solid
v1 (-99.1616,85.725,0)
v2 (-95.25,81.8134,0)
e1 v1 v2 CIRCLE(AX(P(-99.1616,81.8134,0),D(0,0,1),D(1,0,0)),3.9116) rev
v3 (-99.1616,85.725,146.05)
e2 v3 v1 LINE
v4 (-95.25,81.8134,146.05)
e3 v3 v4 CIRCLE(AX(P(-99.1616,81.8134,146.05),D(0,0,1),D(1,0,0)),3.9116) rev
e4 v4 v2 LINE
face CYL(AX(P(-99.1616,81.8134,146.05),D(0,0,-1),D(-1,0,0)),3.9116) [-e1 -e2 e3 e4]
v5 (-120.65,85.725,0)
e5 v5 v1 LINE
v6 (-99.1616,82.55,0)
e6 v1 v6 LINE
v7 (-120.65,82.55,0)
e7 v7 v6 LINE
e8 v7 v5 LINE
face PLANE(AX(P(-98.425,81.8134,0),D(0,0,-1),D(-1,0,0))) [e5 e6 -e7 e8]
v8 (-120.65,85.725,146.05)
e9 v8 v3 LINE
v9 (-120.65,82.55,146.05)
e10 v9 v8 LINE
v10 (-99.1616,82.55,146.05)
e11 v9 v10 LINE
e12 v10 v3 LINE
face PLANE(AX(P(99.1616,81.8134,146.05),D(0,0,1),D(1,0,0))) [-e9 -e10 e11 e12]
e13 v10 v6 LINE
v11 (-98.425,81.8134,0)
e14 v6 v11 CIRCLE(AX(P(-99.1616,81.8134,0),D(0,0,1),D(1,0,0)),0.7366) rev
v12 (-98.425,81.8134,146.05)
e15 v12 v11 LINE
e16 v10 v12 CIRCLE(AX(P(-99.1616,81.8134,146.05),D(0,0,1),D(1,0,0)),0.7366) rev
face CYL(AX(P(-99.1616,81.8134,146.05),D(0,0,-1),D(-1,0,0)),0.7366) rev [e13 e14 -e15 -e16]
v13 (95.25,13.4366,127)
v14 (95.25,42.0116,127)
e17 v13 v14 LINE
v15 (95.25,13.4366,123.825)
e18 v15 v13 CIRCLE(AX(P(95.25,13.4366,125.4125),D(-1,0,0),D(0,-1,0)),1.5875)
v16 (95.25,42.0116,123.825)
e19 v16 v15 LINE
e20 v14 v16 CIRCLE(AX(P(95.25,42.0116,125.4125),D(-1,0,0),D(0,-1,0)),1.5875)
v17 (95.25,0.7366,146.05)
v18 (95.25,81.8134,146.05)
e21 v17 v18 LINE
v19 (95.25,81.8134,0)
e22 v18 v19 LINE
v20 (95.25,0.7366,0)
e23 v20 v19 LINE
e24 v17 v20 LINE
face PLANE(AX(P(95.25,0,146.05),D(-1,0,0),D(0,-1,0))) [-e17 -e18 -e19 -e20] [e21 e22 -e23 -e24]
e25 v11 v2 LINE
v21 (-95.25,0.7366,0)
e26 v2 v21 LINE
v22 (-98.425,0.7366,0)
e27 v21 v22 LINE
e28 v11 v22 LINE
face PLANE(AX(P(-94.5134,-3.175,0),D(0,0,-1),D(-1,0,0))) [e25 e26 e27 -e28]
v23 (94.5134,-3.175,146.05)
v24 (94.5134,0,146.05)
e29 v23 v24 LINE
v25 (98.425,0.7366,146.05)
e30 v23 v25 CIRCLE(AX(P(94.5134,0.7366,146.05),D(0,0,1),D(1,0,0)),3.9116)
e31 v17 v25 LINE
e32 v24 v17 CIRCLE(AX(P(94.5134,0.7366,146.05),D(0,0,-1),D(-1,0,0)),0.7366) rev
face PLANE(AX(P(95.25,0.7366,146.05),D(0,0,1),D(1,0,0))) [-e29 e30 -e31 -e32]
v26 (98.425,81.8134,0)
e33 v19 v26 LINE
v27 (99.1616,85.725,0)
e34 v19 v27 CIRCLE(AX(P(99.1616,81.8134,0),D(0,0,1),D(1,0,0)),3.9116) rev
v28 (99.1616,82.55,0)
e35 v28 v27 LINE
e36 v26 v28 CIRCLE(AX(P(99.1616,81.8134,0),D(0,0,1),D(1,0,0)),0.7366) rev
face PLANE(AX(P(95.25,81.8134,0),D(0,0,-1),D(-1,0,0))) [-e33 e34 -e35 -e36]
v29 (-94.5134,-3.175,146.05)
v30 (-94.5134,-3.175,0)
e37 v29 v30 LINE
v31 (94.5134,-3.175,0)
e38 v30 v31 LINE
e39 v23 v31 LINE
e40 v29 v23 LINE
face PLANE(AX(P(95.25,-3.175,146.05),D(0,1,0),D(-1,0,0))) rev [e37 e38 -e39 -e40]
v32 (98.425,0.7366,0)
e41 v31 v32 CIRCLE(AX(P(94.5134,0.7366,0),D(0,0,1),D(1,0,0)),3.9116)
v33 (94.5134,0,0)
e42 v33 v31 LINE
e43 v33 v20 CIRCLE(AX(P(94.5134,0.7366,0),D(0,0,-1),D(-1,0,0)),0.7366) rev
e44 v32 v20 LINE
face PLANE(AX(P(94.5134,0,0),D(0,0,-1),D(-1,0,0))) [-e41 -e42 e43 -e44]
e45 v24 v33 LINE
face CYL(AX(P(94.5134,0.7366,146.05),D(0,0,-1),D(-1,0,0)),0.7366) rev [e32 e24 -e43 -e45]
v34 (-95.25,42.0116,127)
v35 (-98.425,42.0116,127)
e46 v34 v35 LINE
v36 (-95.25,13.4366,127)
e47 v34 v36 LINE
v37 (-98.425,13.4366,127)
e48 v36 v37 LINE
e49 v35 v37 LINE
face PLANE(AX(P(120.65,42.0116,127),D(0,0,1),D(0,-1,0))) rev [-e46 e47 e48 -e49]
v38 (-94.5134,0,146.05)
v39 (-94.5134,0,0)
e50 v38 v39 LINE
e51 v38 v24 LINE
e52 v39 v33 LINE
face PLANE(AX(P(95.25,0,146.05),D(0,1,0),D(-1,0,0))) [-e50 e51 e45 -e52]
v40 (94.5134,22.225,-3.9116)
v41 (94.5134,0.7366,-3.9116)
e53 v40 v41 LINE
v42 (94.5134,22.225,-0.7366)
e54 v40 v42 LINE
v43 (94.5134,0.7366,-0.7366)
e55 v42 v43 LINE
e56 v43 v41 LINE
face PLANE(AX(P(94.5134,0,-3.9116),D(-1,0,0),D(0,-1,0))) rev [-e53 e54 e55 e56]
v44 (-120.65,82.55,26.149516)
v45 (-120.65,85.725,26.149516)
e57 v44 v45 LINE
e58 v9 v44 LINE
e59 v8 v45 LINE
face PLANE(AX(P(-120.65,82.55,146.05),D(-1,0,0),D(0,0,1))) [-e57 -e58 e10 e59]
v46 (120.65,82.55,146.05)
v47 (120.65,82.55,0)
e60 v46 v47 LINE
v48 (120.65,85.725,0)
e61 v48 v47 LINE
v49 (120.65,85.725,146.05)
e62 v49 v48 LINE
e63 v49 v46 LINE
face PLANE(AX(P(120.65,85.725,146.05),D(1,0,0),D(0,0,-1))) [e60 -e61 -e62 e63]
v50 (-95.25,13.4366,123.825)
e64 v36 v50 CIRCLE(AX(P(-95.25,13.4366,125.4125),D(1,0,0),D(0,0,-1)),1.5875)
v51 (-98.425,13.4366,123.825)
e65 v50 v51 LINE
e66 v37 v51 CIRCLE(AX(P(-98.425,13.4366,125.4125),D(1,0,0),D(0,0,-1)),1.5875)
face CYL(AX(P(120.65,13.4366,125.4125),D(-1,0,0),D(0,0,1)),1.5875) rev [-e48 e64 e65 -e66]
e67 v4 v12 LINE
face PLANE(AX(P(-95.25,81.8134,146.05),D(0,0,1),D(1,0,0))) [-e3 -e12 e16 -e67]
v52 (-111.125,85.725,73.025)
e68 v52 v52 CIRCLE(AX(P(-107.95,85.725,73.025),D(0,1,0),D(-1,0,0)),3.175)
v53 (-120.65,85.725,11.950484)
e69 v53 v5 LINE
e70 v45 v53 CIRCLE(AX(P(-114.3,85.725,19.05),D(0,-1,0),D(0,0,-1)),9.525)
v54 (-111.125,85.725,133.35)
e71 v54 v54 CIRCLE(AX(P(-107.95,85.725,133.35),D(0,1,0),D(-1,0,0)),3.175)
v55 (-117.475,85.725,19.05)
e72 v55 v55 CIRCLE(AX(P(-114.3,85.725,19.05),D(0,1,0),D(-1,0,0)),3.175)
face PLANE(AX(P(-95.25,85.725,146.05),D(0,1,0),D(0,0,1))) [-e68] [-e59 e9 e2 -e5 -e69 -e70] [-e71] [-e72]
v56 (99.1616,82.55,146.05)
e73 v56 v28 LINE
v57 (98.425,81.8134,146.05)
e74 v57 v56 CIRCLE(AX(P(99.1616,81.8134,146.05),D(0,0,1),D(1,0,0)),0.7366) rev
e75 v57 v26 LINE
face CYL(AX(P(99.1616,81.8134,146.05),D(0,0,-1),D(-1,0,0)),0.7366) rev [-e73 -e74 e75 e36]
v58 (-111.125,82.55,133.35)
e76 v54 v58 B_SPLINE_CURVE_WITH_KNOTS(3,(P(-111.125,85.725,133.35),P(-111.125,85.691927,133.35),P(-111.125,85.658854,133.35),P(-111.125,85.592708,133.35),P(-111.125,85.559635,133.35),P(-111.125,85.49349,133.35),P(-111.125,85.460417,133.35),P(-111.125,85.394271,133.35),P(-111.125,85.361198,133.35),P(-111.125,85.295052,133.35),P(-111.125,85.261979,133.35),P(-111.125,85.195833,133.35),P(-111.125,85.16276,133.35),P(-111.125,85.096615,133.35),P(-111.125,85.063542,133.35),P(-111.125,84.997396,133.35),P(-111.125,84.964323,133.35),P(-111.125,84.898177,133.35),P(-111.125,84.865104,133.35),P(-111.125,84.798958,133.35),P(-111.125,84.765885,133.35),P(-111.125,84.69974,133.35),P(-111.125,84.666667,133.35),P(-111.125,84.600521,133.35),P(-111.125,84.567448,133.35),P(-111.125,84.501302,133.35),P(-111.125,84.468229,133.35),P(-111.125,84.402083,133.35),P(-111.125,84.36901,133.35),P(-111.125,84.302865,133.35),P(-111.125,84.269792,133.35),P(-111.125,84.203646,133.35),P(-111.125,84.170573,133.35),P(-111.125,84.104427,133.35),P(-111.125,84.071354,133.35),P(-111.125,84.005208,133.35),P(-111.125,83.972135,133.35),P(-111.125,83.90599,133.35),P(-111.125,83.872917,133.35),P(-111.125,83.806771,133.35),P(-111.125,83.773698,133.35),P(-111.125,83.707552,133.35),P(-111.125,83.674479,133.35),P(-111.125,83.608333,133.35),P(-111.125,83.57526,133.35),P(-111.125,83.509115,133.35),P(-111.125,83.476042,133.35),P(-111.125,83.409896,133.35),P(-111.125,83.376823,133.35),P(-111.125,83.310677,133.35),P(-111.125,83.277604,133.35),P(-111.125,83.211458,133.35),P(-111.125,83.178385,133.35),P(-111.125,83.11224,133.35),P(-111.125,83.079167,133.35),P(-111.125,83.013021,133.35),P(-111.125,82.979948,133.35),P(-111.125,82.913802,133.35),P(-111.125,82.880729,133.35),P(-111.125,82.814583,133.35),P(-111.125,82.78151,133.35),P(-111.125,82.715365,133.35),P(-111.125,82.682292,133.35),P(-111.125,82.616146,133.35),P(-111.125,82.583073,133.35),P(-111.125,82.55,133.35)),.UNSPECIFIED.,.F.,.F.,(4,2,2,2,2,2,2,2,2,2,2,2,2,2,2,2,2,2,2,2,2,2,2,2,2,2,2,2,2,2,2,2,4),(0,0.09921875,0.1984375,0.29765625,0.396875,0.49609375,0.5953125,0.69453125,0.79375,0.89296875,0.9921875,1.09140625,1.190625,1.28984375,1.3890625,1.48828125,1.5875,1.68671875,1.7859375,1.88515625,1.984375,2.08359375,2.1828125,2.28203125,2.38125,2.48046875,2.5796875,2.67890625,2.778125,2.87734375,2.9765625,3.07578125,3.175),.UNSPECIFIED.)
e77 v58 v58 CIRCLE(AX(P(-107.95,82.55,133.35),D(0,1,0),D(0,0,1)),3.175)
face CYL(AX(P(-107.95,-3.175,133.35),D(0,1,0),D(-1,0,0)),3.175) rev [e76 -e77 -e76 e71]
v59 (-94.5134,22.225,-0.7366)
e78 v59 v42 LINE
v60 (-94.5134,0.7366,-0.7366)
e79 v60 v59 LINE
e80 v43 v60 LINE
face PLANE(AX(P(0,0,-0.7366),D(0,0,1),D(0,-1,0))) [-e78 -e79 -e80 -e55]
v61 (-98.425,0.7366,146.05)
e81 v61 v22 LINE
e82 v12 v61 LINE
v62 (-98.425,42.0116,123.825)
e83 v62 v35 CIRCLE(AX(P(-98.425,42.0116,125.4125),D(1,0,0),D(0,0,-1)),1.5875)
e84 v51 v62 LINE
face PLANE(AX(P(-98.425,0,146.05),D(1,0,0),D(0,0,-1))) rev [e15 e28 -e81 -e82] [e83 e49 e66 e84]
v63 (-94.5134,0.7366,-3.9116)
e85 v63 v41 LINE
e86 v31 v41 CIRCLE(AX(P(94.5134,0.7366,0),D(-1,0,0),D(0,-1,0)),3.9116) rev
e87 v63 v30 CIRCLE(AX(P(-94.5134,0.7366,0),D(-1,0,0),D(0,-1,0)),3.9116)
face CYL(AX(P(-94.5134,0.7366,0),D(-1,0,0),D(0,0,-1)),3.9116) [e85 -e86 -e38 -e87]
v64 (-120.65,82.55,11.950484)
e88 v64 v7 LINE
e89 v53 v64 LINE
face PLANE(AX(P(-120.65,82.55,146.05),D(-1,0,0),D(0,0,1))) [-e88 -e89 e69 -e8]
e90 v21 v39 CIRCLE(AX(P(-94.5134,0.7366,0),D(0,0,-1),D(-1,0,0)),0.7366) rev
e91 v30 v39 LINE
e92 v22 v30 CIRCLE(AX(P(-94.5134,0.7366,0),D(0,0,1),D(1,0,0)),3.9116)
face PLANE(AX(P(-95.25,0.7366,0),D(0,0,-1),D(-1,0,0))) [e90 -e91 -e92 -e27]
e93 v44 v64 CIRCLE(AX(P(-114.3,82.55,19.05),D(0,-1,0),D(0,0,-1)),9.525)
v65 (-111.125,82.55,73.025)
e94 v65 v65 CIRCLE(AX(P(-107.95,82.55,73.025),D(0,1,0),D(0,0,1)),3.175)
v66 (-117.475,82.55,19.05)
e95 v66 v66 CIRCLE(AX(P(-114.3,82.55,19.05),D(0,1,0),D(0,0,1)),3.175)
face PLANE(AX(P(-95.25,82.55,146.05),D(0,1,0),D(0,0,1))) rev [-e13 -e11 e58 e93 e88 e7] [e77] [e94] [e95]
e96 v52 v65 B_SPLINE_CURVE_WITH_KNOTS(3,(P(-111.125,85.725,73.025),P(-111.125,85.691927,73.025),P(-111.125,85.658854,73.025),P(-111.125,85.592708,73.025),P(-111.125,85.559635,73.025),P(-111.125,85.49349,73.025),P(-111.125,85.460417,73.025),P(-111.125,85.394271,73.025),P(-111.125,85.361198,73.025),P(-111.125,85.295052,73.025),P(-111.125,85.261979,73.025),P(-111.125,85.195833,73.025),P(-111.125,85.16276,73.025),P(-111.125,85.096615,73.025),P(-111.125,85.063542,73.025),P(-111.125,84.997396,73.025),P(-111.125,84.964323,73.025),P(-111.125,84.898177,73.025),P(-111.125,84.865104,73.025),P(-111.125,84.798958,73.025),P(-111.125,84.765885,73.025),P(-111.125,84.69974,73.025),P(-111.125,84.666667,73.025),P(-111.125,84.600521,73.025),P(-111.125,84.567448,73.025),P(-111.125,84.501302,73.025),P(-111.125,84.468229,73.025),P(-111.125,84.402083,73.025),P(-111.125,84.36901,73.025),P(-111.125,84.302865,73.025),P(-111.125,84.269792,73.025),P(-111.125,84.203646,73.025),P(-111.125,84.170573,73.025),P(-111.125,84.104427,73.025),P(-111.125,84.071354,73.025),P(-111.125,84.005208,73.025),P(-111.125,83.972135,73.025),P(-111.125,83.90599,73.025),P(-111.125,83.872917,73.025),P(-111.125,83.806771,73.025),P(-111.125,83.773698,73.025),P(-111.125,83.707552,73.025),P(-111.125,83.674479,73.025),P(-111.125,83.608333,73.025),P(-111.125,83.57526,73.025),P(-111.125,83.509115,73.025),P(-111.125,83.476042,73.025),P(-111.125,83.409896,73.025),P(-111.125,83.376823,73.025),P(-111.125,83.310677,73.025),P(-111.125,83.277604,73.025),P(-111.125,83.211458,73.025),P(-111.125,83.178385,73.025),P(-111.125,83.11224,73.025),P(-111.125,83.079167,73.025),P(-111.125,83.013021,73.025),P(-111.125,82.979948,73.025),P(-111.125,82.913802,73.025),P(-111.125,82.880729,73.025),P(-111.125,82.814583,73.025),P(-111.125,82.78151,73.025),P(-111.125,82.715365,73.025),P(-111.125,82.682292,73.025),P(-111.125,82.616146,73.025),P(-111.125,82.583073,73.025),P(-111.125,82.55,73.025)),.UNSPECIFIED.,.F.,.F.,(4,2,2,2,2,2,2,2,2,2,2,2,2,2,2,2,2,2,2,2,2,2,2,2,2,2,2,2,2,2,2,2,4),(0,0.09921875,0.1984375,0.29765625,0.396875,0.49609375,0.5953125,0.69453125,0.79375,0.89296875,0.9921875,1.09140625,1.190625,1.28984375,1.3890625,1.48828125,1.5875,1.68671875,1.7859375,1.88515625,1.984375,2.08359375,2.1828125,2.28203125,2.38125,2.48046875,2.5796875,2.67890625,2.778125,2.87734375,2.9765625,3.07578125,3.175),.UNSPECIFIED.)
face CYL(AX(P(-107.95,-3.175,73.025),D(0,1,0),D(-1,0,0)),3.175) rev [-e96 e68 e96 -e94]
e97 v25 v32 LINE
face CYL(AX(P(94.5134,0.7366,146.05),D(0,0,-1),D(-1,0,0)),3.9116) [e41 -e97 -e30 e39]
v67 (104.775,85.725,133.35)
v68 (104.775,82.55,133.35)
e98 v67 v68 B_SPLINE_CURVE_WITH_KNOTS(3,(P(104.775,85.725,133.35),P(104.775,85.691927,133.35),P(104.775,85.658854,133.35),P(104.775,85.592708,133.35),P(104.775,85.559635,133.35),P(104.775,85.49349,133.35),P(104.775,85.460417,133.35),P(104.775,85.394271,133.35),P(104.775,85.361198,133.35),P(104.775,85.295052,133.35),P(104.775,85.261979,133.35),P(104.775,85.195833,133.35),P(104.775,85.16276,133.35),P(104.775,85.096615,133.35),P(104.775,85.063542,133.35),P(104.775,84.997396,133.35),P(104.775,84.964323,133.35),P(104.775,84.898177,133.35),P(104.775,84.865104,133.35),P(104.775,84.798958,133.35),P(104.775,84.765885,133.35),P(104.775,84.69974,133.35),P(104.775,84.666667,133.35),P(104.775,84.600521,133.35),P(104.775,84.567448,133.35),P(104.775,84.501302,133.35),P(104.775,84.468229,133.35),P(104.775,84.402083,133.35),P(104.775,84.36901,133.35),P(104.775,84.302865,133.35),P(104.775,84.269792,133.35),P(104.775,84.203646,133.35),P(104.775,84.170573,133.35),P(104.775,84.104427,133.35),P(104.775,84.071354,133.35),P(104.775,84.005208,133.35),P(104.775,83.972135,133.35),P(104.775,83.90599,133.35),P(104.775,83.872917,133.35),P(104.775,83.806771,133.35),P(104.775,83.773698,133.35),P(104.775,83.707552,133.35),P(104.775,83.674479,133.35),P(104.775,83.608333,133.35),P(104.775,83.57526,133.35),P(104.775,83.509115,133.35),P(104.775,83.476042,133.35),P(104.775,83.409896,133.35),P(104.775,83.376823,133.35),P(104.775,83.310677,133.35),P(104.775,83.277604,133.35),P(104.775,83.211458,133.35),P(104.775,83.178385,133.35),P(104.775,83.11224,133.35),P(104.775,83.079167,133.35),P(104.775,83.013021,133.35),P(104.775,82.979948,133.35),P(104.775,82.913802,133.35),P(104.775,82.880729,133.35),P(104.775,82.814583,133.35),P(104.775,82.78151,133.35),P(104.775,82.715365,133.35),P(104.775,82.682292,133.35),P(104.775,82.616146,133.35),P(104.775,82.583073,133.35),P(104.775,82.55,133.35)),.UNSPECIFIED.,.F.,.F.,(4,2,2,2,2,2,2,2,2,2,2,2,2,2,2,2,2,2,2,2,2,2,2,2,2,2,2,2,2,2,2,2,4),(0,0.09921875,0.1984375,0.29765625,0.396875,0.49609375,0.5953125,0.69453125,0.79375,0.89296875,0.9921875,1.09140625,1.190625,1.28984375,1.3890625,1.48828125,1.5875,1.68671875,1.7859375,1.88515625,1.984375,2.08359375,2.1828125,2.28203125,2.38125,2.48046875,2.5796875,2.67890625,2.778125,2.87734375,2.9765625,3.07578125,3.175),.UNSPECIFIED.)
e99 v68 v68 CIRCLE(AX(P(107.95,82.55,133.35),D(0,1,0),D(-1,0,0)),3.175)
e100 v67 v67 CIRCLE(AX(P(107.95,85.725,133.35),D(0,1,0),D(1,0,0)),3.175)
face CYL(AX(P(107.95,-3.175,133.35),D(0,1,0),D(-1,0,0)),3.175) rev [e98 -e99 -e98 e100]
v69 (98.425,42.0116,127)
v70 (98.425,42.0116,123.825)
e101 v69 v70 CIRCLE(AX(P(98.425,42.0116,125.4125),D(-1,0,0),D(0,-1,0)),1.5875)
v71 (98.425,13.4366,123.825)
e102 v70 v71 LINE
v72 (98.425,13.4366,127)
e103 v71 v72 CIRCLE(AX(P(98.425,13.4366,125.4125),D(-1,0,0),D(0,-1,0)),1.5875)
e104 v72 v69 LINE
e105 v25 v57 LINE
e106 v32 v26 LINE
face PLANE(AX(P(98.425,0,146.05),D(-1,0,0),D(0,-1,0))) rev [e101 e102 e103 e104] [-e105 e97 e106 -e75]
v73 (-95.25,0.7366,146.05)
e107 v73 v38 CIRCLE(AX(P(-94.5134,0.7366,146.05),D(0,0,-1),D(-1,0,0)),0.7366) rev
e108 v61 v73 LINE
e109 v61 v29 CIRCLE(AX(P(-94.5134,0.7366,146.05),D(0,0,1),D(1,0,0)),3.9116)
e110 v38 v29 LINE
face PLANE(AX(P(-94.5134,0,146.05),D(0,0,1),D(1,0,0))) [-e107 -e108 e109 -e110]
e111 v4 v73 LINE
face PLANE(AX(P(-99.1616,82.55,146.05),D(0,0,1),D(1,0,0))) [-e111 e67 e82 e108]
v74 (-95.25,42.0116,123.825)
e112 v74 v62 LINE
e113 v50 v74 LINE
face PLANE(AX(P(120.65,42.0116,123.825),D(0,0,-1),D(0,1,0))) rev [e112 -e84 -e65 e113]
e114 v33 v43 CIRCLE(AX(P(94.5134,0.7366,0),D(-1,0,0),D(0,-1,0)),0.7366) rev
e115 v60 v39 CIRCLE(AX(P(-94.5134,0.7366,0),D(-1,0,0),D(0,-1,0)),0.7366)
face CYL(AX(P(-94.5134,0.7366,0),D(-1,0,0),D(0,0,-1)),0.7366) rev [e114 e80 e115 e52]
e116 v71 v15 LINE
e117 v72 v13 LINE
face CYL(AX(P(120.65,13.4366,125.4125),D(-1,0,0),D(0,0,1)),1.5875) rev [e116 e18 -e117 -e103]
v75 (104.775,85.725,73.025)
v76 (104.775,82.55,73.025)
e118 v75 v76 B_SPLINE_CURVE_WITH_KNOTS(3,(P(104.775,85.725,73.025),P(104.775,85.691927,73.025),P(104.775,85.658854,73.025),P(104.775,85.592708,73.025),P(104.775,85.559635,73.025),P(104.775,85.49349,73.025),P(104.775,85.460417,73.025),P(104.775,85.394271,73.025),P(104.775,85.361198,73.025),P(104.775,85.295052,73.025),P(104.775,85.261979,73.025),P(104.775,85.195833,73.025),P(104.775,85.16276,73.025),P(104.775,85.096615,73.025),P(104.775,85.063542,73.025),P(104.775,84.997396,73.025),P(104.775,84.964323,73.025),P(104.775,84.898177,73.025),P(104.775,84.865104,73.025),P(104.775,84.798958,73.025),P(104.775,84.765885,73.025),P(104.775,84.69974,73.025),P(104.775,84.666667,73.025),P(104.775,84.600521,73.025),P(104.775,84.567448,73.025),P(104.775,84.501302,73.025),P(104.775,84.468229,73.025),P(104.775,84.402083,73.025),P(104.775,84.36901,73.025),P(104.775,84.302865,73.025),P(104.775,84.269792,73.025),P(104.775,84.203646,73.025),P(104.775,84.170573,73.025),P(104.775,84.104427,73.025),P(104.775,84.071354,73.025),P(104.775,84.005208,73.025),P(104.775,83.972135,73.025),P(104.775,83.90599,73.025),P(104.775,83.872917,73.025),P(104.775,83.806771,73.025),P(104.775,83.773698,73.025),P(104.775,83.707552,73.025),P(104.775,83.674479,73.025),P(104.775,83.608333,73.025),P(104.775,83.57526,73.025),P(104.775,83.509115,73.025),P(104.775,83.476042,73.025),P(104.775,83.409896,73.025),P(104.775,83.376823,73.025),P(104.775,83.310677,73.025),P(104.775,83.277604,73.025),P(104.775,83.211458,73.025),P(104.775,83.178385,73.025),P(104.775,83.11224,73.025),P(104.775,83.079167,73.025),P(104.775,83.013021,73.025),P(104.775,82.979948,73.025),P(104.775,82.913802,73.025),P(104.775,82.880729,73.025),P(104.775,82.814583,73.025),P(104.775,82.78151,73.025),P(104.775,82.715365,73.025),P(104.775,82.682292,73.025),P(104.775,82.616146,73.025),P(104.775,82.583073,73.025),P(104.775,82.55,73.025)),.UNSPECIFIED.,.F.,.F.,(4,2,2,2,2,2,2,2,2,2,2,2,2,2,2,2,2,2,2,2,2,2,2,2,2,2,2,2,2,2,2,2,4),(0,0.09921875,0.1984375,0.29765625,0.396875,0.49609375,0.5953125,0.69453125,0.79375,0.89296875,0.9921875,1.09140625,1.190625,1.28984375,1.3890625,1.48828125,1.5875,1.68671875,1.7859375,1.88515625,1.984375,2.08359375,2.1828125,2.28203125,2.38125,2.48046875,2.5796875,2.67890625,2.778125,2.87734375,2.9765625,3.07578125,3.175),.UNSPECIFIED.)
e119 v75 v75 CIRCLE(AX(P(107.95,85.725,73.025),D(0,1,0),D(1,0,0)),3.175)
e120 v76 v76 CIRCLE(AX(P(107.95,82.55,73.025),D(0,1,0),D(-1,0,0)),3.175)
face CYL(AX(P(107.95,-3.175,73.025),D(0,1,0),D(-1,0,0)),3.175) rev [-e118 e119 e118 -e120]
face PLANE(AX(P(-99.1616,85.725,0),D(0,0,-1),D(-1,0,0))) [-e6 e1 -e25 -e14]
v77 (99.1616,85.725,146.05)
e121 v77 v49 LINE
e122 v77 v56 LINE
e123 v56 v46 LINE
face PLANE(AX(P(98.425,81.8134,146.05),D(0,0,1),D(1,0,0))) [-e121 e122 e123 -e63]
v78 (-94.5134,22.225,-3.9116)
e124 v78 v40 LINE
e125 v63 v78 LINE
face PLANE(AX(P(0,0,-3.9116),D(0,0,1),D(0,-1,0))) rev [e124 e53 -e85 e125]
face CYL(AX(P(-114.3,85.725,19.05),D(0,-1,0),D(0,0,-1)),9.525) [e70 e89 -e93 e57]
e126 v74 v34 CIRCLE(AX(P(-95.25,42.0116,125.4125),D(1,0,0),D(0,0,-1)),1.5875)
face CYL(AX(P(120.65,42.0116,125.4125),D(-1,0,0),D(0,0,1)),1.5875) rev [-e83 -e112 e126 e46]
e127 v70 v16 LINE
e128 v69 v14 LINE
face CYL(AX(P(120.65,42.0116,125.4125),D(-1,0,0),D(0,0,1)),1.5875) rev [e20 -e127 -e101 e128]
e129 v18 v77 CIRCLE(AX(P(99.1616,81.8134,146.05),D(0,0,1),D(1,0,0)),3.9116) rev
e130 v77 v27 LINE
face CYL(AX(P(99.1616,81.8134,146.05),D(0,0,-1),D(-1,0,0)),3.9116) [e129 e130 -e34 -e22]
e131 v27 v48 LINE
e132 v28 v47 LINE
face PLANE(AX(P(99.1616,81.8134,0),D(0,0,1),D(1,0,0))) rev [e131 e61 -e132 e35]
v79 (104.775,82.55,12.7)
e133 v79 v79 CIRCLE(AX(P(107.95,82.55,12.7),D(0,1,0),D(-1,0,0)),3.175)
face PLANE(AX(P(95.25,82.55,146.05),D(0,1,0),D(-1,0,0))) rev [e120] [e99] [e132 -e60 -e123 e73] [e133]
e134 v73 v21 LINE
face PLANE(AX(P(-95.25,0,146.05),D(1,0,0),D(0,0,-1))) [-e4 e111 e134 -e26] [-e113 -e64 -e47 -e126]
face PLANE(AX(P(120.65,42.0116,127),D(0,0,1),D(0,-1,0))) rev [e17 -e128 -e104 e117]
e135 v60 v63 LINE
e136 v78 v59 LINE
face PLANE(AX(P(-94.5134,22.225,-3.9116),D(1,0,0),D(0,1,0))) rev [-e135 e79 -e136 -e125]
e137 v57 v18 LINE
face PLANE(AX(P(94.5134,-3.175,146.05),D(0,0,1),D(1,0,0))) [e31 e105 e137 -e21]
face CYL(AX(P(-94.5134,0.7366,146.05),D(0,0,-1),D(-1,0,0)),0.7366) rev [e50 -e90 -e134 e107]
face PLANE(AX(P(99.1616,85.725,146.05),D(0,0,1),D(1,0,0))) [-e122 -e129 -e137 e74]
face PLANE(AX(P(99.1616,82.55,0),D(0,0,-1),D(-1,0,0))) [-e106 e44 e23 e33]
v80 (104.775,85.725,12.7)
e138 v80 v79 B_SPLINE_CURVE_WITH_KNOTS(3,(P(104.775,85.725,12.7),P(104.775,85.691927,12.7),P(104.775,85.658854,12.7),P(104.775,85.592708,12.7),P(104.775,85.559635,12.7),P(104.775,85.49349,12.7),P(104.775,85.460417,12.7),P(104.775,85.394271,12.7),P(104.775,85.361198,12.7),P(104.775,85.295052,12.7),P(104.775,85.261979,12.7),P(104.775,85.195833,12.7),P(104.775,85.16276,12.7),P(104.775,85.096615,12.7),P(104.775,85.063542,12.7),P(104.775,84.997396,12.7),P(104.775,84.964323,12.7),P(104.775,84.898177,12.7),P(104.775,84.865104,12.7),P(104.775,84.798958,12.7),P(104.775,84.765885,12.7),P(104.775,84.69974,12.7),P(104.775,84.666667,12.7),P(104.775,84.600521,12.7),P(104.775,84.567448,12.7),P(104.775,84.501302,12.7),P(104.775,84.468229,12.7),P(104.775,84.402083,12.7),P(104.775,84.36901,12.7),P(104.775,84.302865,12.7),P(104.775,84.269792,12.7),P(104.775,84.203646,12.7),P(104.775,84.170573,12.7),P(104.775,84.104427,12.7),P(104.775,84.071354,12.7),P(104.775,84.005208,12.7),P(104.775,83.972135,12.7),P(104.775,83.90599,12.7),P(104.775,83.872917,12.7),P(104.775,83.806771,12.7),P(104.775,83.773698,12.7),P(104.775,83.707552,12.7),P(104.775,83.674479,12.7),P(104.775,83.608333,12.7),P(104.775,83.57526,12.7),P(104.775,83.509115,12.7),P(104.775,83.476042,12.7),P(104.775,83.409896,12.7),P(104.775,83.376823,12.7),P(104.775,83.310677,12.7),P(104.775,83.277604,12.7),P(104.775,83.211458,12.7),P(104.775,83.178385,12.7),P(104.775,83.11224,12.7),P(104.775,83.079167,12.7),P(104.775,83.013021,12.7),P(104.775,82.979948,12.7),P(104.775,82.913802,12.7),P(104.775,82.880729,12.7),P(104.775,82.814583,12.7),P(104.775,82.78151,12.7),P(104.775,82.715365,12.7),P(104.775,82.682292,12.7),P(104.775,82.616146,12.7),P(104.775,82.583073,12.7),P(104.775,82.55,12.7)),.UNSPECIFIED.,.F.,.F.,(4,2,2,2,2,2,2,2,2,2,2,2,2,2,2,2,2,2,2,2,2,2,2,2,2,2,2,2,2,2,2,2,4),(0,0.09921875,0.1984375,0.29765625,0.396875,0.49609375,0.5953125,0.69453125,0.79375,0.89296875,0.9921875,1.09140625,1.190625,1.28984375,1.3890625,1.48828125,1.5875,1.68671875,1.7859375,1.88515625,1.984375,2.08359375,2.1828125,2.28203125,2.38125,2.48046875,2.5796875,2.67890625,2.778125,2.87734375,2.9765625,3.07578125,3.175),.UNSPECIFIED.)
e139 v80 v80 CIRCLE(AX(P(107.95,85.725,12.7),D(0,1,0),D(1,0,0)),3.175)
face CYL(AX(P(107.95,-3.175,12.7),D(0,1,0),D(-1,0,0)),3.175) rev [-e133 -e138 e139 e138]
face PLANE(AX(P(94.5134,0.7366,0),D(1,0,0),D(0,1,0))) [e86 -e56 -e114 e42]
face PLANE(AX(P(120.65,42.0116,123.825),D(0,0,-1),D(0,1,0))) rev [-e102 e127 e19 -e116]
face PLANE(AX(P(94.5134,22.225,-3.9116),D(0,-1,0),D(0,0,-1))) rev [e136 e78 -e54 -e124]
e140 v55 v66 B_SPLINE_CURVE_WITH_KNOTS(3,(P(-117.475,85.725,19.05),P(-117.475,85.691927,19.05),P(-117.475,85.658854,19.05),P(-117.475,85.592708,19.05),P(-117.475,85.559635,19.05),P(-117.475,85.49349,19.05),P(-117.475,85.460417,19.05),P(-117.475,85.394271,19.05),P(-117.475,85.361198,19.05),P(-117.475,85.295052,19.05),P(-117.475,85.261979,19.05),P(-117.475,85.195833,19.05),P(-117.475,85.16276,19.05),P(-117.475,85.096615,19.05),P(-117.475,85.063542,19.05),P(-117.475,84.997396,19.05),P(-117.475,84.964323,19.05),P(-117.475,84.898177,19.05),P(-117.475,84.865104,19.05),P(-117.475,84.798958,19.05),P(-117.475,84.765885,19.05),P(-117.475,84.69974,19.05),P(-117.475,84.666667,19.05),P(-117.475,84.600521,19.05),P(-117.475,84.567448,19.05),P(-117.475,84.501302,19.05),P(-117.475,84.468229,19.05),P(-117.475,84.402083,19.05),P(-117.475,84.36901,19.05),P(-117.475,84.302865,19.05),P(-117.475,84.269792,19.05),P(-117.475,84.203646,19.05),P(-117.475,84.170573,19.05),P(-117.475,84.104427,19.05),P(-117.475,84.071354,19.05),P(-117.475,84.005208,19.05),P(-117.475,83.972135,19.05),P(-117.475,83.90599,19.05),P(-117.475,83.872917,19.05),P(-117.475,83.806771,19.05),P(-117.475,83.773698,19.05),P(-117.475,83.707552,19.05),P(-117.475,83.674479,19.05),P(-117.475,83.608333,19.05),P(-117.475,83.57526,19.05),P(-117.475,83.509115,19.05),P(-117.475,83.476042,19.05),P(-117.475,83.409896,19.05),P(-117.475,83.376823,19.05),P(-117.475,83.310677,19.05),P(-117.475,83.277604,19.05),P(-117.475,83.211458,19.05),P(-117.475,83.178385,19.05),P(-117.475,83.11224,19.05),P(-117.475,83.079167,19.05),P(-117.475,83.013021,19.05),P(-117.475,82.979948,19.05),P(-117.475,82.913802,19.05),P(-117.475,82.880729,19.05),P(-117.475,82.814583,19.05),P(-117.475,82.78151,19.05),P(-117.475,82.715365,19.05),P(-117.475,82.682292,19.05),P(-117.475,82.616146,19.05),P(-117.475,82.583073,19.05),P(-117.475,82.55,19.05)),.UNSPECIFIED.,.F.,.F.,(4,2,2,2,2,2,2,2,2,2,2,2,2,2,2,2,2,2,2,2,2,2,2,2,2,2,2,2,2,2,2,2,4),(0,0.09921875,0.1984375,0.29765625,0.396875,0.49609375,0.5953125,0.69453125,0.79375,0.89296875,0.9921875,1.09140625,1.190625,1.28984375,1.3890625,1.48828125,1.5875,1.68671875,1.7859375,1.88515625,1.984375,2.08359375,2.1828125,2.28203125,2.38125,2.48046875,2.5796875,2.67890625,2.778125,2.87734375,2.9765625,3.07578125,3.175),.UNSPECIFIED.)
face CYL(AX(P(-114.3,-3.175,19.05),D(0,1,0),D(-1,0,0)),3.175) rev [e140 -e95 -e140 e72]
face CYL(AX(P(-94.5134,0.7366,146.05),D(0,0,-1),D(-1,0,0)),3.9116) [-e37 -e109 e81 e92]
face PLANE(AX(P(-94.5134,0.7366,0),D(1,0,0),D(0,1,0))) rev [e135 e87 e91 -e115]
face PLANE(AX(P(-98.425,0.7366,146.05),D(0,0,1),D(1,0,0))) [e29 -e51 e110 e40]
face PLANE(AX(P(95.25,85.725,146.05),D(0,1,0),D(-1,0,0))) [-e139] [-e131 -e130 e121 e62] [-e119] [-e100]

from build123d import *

# Parameters (mm, degrees)
BASE_FLANGE1_DEPTH      = 146.05
EDGE_FLANGE1_DEPTH      = 189.0268
SKETCH9_R               = 3.175
CUT_EXTRUDE1_DEPTH      = 210.261164577
CUT_EXTRUDE2_DEPTH      = 208.932201991
CUT_EXTRUDE2_DEPTH_BACK = 208.932201991
TAB1_START              = -3.175
SKETCH15_R              = 9.525
SKETCH15_R_2            = 3.175
TAB1_DEPTH              = 3.175


# Sheet-metal steps are written as plain solids
with BuildPart() as part:
    # Sketch1 → Base-Flange1 (new body)
    with BuildSketch(Plane.XY):
        with BuildLine():
            Line((120.65, 85.725), (99.1616, 85.725))
            ThreePointArc((99.1616, 85.725), (96.395681115, 84.579318885), (95.25, 81.8134))
            Line((95.25, 81.8134), (95.25, 0.7366))
            ThreePointArc((95.25, 0.7366), (95.034254855, 0.215745145), (94.5134, 0))
            Line((94.5134, 0), (-94.5134, 0))
            ThreePointArc((-94.5134, 0), (-95.034254855, 0.215745145), (-95.25, 0.7366))
            Line((-95.25, 0.7366), (-95.25, 81.8134))
            ThreePointArc((-95.25, 81.8134), (-96.395681115, 84.579318885), (-99.1616, 85.725))
            Line((-99.1616, 85.725), (-120.65, 85.725))
            Line((-120.65, 85.725), (-120.65, 82.55))
            Line((-120.65, 82.55), (-99.1616, 82.55))
            ThreePointArc((-99.1616, 82.55), (-98.640745145, 82.334254855), (-98.425, 81.8134))
            Line((-98.425, 81.8134), (-98.425, 0.7366))
            ThreePointArc((-98.425, 0.7366), (-97.279318885, -2.029318885), (-94.5134, -3.175))
            Line((-94.5134, -3.175), (94.5134, -3.175))
            ThreePointArc((94.5134, -3.175), (97.279318885, -2.029318885), (98.425, 0.7366))
            Line((98.425, 0.7366), (98.425, 81.8134))
            ThreePointArc((98.425, 81.8134), (98.640745145, 82.334254855), (99.1616, 82.55))
            Line((99.1616, 82.55), (120.65, 82.55))
            Line((120.65, 82.55), (120.65, 85.725))
        make_face()
    extrude(amount=BASE_FLANGE1_DEPTH)

    # Edge-Flange1 section (across the edge) → Edge-Flange1 (add)
    with BuildSketch(Plane(origin=(94.5134, 0, -0.7366), x_dir=(0, 0, 1), z_dir=(-1, 0, 0))):
        with BuildLine():
            Line((-3.175, 0.7366), (-3.175, 22.225))
            Line((-3.175, 22.225), (0, 22.225))
            Line((0, 22.225), (0, 0.7366))
            ThreePointArc((0, 0.7366), (0.215745145, 0.215745145), (0.7366, 0))
            Line((0.7366, 0), (0.7366, -3.175))
            ThreePointArc((0.7366, -3.175), (-2.029318885, -2.029318885), (-3.175, 0.7366))
        make_face()
    extrude(amount=EDGE_FLANGE1_DEPTH)

    # Sketch9 → Cut-Extrude1 (cut, through all)
    with BuildSketch(Plane(origin=(0, 85.725, 0), x_dir=(1, 0, 0), z_dir=(0, 1, 0))):
        with Locations(Location((-114.3, -19.05, 0), (0, 0, 180))):
            Circle(SKETCH9_R)
        with Locations(Location((-107.95, -73.025, 0), (0, 0, 180))):
            Circle(SKETCH9_R)
        with Locations(Location((-107.95, -133.35, 0), (0, 0, 180))):
            Circle(SKETCH9_R)
        with Locations(Location((107.95, -133.35, 0), (0, 0, 180))):
            Circle(SKETCH9_R)
        with Locations(Location((107.95, -73.025, 0), (0, 0, 180))):
            Circle(SKETCH9_R)
        with Locations(Location((107.95, -12.7, 0), (0, 0, 180))):
            Circle(SKETCH9_R)
    extrude(amount=-CUT_EXTRUDE1_DEPTH, mode=Mode.SUBTRACT)

    # Sketch14 → Cut-Extrude2 (cut, two sides: drawn at the far end of the back side and taken through both)
    with BuildSketch(Plane(origin=(0, 0, 0), x_dir=(0, 1, 0), z_dir=(-1, 0, 0)).offset(-CUT_EXTRUDE2_DEPTH_BACK)):
        with BuildLine():
            Line((42.0116, -127), (13.4366, -127))
            ThreePointArc((13.4366, -127), (11.8491, -125.4125), (13.4366, -123.825))
            Line((13.4366, -123.825), (42.0116, -123.825))
            ThreePointArc((42.0116, -123.825), (43.5991, -125.4125), (42.0116, -127))
        make_face()
    extrude(amount=CUT_EXTRUDE2_DEPTH + CUT_EXTRUDE2_DEPTH_BACK, mode=Mode.SUBTRACT)

    # Sketch15 → Tab1 (add)
    with BuildSketch(Plane.XZ.offset(-82.55).offset(TAB1_START)):
        with Locations((-114.3, 19.05)):
            Circle(SKETCH15_R)
        with Locations(Location((-114.3, 19.05, 0), (0, 0, 180))):
            Circle(SKETCH15_R_2, mode=Mode.SUBTRACT)
    extrude(amount=TAB1_DEPTH)


solid = part.part
